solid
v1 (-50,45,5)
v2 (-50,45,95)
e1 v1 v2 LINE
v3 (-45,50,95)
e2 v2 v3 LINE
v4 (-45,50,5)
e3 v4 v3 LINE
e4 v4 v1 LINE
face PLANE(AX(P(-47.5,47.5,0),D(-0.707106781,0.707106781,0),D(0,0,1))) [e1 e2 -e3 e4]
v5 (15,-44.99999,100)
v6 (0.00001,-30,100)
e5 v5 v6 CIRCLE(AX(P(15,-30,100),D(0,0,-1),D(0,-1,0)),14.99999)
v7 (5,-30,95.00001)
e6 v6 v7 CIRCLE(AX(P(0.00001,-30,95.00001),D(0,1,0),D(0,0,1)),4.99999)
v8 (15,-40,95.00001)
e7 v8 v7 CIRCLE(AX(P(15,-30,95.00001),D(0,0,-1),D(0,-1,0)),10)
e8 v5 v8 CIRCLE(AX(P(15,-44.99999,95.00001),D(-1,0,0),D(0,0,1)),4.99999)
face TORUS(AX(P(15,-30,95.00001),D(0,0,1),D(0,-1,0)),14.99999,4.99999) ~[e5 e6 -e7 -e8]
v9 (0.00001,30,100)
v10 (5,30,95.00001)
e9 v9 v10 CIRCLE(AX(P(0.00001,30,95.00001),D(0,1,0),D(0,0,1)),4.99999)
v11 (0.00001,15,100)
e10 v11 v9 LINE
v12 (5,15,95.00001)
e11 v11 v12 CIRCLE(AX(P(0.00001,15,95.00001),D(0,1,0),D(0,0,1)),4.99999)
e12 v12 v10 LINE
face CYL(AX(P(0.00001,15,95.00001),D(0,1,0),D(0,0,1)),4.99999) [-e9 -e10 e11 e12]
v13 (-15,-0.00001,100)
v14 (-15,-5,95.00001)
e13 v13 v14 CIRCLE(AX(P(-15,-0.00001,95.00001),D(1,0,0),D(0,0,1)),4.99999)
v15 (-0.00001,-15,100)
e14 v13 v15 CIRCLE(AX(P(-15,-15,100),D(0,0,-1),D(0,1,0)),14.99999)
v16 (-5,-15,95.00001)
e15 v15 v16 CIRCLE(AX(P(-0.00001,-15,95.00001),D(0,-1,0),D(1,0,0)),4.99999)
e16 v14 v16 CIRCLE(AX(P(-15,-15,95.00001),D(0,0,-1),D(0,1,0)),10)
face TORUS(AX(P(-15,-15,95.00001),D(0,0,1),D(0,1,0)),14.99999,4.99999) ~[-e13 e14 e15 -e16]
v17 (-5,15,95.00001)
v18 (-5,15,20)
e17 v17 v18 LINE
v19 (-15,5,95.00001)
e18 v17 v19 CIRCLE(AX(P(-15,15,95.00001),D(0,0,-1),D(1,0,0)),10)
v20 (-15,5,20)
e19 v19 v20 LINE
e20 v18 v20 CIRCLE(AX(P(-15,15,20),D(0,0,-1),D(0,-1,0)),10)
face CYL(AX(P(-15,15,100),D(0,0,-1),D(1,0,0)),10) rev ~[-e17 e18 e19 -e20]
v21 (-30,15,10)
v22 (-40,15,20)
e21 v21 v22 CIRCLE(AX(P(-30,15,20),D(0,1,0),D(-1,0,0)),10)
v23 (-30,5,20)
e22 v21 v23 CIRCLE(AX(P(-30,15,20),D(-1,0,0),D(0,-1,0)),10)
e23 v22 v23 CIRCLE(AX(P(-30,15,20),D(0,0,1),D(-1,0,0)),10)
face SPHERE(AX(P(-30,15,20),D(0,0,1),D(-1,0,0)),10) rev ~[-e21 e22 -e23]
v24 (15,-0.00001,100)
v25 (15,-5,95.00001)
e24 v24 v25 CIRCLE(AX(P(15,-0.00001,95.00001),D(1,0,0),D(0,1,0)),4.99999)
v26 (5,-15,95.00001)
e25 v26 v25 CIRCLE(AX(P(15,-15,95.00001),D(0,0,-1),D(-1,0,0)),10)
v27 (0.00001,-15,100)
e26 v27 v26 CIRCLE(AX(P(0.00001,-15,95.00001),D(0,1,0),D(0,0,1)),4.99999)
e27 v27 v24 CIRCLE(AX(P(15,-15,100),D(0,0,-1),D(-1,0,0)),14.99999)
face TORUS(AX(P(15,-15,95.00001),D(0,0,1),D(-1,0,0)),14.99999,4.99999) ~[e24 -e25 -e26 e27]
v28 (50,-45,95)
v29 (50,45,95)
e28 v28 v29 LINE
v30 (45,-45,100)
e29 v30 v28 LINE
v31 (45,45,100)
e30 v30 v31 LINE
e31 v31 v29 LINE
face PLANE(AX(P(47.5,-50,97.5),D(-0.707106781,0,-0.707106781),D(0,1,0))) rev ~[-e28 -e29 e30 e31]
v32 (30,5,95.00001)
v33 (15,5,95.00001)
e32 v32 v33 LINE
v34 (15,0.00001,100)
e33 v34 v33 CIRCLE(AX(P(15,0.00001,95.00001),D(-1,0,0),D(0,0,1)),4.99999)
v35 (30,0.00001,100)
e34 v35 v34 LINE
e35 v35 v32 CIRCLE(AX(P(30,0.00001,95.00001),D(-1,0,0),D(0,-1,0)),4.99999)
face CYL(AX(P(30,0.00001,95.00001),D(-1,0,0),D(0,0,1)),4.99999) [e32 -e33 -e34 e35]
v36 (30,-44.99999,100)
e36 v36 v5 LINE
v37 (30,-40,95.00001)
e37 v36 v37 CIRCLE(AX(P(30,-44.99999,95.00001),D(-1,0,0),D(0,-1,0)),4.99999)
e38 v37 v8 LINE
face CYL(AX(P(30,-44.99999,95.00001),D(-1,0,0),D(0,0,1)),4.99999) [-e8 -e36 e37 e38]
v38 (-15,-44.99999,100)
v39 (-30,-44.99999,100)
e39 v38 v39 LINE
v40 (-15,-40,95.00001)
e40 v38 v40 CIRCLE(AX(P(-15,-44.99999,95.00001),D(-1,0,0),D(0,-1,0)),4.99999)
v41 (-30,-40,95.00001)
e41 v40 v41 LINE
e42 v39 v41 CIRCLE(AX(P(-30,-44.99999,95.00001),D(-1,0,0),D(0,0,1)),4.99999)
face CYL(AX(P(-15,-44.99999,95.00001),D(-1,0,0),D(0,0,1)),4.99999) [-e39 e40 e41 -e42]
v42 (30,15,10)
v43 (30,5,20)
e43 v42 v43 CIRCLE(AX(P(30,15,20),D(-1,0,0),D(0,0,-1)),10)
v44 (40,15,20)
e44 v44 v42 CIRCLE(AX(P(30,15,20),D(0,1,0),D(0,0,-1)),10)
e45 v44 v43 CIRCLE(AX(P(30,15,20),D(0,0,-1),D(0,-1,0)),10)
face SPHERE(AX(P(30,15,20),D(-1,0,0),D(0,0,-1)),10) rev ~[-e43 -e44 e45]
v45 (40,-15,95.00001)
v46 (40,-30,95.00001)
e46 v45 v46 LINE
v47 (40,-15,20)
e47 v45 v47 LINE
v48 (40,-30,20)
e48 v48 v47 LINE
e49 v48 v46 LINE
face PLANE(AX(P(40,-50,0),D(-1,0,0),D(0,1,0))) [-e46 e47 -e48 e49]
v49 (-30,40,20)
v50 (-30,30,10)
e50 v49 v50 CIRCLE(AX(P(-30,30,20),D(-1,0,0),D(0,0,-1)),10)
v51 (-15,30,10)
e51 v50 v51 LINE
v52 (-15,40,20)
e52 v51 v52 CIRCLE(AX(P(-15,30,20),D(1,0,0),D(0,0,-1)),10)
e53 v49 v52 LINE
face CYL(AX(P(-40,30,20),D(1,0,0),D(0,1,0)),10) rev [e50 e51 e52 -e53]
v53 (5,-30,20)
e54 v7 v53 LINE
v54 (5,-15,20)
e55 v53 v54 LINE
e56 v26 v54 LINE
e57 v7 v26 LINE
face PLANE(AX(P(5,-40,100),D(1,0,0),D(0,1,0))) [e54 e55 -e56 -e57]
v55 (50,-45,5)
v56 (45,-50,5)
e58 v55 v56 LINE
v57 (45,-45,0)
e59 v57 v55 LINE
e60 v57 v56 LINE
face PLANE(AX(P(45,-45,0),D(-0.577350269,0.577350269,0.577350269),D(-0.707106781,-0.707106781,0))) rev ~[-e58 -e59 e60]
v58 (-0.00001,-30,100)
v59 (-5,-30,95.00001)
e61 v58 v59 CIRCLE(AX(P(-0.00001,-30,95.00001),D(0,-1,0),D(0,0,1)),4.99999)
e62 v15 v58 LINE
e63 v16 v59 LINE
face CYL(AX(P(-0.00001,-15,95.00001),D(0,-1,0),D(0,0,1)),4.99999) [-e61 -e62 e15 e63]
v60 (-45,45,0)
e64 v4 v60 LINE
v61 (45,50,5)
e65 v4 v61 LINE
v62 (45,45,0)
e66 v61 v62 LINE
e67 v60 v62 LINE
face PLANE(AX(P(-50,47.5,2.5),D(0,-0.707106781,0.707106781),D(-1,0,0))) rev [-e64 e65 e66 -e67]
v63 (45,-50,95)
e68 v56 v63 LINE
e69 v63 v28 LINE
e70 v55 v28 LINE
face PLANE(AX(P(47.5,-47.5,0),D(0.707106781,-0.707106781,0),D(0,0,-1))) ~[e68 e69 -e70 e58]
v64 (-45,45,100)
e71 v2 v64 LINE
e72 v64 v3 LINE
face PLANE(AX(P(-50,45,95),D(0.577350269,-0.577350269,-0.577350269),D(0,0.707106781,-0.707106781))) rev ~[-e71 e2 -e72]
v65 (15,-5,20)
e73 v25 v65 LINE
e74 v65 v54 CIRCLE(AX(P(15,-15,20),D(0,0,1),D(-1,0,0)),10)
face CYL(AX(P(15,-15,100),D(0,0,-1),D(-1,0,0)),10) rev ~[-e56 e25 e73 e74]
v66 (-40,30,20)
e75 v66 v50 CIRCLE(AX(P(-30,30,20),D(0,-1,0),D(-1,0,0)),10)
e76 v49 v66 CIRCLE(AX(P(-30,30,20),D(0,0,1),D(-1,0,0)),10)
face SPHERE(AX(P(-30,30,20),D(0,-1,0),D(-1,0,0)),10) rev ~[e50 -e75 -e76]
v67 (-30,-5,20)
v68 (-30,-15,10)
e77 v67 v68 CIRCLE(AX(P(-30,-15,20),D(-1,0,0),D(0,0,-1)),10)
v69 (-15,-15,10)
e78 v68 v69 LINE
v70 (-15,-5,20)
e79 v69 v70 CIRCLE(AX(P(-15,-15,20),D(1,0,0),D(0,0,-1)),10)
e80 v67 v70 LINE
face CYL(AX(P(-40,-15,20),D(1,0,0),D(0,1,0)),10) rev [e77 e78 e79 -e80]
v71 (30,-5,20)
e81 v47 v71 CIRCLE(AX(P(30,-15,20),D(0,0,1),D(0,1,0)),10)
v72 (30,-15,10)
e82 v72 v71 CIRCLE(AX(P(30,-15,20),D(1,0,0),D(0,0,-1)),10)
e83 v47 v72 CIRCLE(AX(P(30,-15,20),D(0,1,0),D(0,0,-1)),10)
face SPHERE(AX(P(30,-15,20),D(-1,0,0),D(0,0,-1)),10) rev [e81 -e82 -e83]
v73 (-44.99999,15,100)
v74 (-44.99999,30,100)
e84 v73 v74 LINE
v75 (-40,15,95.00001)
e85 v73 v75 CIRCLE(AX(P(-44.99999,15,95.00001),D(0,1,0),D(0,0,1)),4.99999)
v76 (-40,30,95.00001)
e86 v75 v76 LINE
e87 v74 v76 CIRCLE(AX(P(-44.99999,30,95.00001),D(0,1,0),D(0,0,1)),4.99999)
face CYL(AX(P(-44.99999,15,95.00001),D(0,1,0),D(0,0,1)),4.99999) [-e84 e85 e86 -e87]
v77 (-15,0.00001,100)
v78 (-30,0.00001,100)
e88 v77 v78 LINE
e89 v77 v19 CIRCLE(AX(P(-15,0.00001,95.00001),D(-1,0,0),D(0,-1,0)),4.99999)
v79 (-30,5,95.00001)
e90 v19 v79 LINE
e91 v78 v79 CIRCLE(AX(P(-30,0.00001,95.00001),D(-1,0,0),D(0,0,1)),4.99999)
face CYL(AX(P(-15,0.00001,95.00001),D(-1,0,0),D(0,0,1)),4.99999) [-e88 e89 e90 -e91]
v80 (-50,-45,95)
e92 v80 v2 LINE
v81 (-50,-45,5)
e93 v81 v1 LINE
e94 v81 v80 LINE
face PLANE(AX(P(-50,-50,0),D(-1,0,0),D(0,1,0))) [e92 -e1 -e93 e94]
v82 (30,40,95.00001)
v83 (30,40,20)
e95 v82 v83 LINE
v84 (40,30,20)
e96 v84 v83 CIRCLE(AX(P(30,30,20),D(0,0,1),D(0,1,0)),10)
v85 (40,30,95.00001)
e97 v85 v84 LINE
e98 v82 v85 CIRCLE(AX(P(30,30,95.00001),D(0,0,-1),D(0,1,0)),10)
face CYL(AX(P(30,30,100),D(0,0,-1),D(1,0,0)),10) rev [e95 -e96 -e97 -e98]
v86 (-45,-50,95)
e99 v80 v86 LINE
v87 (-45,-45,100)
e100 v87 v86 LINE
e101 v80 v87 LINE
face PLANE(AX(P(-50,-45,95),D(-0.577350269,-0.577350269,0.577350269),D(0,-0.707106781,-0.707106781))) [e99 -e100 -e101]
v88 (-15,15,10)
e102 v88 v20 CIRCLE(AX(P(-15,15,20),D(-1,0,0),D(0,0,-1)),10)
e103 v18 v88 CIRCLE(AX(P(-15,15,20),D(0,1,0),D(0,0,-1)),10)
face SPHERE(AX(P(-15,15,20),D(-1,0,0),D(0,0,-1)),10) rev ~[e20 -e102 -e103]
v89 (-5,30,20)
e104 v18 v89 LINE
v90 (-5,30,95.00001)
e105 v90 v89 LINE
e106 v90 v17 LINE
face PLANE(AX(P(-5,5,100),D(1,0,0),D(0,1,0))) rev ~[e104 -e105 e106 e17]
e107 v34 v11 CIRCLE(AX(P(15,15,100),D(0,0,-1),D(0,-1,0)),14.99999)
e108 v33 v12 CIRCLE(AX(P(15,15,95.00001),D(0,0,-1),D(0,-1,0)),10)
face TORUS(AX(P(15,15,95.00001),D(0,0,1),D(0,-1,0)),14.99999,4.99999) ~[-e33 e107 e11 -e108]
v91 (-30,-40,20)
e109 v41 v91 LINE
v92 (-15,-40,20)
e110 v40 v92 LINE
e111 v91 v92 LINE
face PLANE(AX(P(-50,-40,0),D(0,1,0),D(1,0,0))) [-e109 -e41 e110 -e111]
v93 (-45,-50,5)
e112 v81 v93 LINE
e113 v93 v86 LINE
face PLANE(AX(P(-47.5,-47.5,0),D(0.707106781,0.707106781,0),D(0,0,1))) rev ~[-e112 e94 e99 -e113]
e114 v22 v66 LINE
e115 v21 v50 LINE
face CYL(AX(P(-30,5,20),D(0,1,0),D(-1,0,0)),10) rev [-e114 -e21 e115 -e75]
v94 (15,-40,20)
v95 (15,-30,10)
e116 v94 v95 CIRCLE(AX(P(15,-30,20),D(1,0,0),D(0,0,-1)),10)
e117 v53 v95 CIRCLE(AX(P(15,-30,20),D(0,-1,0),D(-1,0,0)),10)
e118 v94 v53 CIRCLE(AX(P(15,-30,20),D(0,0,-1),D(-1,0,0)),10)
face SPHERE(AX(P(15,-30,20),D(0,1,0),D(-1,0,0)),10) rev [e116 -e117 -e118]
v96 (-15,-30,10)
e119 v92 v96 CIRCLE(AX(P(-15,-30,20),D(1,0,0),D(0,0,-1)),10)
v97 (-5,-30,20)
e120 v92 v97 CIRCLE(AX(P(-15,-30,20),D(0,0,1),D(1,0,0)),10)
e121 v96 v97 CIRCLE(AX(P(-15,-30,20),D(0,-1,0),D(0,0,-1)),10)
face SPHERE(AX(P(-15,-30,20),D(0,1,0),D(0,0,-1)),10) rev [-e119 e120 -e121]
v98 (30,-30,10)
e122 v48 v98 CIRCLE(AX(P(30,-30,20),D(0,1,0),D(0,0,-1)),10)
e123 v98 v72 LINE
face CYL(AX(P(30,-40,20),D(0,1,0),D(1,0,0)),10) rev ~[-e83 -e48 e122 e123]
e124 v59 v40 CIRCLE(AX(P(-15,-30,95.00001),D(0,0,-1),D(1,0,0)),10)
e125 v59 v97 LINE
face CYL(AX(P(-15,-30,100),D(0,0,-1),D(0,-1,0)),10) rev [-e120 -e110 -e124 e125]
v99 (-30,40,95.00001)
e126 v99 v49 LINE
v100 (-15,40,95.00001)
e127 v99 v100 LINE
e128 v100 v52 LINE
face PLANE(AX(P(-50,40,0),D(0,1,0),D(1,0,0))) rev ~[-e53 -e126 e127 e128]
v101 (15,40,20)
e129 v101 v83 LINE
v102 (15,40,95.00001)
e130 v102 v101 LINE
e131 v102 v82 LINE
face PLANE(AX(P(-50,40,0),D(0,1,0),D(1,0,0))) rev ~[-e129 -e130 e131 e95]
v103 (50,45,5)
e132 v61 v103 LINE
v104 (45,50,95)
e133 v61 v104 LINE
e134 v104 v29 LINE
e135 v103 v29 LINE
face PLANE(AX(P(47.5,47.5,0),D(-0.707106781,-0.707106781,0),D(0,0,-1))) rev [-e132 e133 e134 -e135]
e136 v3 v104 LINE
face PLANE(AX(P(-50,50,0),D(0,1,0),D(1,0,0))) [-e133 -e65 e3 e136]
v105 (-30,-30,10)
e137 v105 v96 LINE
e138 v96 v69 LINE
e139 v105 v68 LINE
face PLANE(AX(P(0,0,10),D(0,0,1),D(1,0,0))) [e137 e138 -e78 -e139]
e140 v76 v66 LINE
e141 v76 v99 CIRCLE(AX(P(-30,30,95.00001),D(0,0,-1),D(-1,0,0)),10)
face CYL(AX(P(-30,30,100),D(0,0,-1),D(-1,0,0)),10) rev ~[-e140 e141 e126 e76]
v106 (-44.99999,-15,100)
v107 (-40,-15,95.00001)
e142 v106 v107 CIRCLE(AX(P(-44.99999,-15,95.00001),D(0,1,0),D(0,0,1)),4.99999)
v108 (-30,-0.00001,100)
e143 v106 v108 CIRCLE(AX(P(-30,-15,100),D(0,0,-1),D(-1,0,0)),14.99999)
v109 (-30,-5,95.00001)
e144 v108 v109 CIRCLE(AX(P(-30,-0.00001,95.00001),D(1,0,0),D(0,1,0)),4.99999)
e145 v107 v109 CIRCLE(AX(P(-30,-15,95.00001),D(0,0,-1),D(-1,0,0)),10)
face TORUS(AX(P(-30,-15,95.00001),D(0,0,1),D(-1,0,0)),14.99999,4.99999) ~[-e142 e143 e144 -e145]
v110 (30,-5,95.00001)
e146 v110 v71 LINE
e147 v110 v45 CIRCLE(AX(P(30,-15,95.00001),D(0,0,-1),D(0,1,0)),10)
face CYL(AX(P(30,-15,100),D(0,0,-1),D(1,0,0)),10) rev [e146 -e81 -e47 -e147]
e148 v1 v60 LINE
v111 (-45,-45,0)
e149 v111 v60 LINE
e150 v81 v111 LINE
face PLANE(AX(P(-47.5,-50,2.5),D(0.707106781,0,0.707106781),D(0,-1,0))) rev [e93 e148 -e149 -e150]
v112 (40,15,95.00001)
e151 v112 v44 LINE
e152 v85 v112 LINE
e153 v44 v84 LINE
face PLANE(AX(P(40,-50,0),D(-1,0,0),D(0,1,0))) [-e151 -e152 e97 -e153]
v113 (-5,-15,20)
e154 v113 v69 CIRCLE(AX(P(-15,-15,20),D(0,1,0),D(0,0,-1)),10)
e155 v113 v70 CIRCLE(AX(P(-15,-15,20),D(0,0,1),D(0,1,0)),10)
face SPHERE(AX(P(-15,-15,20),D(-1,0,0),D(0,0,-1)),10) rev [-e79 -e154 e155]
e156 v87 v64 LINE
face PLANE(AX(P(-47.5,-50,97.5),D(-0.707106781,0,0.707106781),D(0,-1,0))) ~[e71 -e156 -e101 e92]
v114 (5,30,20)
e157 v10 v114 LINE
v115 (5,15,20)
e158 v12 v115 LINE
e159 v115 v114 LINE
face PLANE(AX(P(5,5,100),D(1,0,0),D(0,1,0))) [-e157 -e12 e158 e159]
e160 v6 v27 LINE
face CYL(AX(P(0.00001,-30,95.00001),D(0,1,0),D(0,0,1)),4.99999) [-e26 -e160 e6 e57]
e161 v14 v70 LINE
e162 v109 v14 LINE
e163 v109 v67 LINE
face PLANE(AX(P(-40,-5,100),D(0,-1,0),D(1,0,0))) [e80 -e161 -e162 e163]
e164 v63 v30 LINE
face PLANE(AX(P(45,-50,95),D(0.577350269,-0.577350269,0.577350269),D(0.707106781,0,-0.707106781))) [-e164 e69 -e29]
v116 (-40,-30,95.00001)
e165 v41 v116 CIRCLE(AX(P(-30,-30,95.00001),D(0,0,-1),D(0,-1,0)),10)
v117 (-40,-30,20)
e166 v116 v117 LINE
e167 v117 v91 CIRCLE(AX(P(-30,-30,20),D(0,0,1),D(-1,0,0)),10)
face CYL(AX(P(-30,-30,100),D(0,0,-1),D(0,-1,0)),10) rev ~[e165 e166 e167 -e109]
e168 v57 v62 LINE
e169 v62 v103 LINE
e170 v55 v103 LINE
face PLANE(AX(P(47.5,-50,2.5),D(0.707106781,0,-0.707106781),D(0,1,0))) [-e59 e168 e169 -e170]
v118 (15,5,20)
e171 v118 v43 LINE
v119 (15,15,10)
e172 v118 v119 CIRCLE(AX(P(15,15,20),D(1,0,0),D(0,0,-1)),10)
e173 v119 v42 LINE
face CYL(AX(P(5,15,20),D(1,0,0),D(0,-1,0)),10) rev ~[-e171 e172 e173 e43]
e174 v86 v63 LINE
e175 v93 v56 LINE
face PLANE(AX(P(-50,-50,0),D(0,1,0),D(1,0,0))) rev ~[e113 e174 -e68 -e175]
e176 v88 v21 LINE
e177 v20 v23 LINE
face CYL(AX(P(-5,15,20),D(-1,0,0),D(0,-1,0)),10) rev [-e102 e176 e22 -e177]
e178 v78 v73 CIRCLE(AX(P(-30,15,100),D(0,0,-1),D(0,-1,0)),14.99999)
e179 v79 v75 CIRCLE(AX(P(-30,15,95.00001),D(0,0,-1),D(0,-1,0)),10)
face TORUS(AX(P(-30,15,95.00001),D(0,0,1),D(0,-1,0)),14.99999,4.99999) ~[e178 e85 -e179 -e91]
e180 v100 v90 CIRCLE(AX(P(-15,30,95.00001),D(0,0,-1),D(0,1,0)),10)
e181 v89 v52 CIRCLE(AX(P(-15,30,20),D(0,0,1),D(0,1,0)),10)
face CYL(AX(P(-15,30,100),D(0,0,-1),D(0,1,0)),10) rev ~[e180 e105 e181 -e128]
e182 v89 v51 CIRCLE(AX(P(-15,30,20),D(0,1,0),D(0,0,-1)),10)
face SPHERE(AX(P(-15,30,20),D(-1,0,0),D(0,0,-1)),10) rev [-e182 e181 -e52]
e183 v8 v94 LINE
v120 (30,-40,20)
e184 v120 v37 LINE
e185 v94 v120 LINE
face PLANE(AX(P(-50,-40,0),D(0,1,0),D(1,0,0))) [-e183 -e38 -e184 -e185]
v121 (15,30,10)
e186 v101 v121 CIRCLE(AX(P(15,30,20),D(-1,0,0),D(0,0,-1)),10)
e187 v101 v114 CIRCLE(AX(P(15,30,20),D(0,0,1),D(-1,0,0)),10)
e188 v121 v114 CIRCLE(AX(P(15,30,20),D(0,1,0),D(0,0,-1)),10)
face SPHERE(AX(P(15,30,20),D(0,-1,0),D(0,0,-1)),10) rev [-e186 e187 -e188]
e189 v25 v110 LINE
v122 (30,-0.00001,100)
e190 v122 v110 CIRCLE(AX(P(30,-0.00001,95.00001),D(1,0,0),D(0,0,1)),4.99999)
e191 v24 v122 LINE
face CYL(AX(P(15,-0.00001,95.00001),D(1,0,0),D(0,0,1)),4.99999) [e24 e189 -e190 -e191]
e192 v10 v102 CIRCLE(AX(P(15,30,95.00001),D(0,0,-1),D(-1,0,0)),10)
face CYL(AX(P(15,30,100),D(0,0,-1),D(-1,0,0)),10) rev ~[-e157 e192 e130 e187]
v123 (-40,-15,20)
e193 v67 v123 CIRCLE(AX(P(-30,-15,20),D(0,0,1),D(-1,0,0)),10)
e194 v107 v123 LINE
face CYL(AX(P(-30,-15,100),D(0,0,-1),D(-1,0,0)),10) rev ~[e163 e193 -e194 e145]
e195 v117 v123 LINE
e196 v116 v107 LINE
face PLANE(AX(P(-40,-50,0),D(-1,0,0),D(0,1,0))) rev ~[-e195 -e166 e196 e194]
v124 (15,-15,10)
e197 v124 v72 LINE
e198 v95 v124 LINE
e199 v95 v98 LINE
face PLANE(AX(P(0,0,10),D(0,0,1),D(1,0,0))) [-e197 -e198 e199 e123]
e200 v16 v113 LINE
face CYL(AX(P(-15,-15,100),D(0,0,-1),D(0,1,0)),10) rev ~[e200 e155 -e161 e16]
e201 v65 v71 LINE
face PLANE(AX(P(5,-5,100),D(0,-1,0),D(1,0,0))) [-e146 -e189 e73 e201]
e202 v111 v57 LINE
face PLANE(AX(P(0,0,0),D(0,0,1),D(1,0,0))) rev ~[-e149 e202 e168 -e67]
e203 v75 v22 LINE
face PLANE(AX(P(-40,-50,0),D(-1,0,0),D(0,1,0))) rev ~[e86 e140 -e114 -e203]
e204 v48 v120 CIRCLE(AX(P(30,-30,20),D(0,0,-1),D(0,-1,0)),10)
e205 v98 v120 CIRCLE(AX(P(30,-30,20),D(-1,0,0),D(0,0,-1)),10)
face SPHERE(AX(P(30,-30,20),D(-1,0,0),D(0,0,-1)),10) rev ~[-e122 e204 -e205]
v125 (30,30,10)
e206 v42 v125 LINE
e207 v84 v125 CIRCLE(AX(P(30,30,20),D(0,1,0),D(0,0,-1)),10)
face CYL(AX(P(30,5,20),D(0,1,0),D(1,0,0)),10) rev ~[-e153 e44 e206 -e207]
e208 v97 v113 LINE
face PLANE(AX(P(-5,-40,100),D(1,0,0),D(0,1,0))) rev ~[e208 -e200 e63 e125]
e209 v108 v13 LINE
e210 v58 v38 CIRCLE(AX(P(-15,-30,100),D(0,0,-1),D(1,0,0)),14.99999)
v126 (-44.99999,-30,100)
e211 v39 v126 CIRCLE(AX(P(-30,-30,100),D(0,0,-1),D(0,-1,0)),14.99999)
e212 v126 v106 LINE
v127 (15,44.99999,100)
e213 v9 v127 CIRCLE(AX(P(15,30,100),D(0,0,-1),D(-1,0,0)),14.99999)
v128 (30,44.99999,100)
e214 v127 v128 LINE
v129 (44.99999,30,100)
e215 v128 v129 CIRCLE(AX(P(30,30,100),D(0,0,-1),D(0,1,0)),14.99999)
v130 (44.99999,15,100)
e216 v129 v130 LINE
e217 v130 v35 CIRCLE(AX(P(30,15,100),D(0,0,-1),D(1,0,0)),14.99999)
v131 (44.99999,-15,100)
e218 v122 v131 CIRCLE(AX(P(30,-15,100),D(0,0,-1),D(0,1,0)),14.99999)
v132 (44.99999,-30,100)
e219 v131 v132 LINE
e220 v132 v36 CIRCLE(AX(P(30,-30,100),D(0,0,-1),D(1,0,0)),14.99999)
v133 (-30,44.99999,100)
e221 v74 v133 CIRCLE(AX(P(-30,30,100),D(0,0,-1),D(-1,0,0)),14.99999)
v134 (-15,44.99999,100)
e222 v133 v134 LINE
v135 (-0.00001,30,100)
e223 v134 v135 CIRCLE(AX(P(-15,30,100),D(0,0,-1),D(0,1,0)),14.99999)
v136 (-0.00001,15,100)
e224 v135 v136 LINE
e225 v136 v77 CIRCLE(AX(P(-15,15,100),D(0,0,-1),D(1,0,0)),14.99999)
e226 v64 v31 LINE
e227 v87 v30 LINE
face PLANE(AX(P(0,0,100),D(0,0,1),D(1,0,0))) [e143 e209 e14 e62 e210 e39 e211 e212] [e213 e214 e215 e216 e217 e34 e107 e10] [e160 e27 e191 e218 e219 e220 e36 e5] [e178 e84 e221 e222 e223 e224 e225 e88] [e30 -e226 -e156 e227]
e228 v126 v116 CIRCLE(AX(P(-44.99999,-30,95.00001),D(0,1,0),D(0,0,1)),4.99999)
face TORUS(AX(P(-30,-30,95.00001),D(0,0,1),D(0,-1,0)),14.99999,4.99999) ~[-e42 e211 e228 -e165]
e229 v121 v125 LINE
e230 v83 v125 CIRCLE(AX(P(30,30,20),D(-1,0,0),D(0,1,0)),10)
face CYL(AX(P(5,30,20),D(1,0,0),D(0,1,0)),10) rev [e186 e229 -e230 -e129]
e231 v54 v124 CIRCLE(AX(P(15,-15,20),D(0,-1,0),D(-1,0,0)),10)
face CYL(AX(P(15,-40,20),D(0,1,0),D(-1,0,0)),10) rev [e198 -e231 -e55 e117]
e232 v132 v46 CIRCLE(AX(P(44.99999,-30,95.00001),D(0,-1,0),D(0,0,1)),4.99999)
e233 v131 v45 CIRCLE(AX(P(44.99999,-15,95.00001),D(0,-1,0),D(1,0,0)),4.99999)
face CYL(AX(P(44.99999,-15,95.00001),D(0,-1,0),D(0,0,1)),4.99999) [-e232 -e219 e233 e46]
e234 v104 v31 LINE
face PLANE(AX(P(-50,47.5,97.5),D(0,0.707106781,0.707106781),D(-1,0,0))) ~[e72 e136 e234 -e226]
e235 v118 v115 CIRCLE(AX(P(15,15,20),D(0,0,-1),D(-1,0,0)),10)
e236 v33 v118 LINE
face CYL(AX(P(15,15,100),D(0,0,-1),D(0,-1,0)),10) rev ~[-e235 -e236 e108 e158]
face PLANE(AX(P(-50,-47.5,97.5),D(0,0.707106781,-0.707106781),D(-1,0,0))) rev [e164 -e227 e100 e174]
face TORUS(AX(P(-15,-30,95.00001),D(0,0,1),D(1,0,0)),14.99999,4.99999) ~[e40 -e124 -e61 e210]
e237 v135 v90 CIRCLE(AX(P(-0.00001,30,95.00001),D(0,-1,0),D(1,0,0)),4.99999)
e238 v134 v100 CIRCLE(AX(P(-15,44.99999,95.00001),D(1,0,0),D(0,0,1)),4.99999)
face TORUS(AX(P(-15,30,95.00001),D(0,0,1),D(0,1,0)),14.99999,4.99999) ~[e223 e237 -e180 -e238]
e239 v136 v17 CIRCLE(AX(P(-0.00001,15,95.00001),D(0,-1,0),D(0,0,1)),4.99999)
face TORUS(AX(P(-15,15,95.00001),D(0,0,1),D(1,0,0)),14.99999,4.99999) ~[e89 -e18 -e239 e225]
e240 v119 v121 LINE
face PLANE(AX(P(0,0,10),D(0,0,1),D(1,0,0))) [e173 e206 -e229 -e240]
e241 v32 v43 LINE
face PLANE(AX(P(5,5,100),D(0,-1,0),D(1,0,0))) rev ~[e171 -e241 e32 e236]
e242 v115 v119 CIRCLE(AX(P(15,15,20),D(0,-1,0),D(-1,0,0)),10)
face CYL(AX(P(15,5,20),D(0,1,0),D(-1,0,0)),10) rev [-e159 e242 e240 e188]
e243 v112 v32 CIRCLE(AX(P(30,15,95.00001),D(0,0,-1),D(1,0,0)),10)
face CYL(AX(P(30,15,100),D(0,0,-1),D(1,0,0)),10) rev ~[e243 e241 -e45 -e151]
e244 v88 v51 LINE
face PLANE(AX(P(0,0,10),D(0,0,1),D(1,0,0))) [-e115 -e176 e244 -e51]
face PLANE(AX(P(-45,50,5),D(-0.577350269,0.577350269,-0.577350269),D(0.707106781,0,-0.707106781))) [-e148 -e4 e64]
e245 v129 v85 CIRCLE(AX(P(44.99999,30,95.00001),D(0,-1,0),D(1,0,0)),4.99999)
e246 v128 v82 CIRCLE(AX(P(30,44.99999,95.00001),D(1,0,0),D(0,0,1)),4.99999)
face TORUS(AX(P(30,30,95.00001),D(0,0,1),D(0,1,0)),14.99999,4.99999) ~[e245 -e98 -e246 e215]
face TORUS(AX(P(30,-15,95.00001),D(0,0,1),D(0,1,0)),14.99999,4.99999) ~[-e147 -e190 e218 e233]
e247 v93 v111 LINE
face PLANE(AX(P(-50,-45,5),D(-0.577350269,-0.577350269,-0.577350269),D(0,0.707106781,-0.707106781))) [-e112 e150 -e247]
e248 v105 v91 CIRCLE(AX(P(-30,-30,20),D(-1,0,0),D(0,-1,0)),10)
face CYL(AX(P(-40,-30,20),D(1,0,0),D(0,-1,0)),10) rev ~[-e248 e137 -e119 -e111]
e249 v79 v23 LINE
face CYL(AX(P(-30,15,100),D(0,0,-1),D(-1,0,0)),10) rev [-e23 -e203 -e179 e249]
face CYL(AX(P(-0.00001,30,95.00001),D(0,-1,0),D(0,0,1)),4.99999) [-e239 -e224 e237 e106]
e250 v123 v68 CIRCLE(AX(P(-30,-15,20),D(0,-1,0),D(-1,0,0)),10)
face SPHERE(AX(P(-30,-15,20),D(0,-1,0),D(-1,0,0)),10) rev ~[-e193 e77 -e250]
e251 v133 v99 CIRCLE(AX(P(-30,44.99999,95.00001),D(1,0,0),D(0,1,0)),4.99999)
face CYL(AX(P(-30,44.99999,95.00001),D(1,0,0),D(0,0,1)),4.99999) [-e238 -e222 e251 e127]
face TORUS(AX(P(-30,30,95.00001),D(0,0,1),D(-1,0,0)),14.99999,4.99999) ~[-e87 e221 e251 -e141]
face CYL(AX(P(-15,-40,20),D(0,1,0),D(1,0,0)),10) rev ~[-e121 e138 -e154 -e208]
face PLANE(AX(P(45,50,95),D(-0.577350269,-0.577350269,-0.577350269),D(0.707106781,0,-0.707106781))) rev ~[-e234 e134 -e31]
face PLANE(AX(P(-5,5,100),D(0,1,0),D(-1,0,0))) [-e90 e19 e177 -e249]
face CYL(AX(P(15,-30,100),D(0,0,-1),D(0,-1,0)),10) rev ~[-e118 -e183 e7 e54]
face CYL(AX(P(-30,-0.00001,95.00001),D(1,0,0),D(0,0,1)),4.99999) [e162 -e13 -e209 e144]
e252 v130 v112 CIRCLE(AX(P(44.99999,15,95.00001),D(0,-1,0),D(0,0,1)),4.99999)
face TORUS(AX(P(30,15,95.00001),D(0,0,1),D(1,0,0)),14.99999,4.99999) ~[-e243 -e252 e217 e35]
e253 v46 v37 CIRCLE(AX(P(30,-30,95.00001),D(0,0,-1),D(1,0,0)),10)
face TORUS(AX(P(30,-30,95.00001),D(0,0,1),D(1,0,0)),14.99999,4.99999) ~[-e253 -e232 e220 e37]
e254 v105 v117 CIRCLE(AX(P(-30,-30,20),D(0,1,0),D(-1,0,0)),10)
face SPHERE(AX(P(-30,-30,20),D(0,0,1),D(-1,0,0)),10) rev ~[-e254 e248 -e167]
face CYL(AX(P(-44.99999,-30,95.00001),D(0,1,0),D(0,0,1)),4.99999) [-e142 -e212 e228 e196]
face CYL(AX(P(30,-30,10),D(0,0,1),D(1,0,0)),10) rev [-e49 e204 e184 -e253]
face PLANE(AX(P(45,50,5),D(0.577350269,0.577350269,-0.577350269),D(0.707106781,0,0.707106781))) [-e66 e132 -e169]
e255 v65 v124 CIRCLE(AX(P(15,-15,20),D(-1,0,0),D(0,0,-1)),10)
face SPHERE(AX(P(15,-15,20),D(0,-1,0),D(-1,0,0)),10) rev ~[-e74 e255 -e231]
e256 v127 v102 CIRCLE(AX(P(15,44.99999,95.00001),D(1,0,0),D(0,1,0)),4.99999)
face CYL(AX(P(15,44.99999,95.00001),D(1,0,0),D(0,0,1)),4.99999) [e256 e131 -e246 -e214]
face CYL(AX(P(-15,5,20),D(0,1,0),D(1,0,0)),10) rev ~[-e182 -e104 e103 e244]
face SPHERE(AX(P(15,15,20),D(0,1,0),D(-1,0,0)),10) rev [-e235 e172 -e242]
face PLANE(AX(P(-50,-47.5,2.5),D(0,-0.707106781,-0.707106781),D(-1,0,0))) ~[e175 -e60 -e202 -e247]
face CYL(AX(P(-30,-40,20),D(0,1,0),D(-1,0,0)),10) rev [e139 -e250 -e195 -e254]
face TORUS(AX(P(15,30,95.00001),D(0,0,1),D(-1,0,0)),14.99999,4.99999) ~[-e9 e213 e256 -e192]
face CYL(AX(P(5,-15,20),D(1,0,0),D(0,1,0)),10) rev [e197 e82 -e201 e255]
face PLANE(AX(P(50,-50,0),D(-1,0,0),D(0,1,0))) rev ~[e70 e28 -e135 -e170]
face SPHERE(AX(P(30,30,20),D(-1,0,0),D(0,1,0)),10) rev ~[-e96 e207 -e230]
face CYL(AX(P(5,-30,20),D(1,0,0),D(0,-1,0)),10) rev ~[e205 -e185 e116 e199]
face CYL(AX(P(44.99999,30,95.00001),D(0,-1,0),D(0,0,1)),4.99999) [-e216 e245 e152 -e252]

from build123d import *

# Parameters (mm, degrees)
F0_W     = 100
F0_H     = 100
F1_DEPTH = 100
F2_T     = -10
F3_W     = 35
F3_H     = 10
F3_W_2   = 10
F3_H_2   = 35
F4_DEPTH = 90
F5_SIZE  = 5
F6_R     = 10
F7_R     = 4.99999


# Not quite as in the source:
# - a fillet or chamfer is up to 0.001 mm smaller than in the source, because OpenCascade refuses the exact size


with BuildPart() as f1:
    # F0 (on Top) → F1 (new body)
    with BuildSketch(Plane.XY):
        Rectangle(F0_W, F0_H)
    extrude(amount=F1_DEPTH)

    # F2
    f2_openings = [f1.faces().sort_by_distance(p)[0] for p in [
        (0, 0, 100),
    ]]
    offset(amount=F2_T, openings=f2_openings)

    # F3 (on face) → F4 (join, through all)
    with BuildSketch(Plane.XY.offset(100)):
        with Locations((-22.5, 0)):
            Rectangle(F3_W, F3_H)
        Rectangle(F3_W_2, F3_H)
        with Locations((0, -22.5)):
            Rectangle(F3_W_2, F3_H_2)
        with Locations((0, 22.5)):
            Rectangle(F3_W_2, F3_H_2)
        with Locations((22.5, 0)):
            Rectangle(F3_W, F3_H)
    extrude(amount=-F4_DEPTH)

    # F5
    f5_edges = [f1.edges().sort_by_distance(p)[0] for p in [
        (50, 0, 100),
        (0, -50, 100),
        (0, 50, 100),
        (-50, 0, 100),
        (50, -50, 50),
        (50, 0, 0),
        (0, -50, 0),
        (-50, -50, 50),
        (-50, 0, 0),
        (-50, 50, 50),
        (0, 50, 0),
        (50, 50, 50),
    ]]
    chamfer(f5_edges, length=F5_SIZE)

    # F6
    f6_edges = [f1.edges().sort_by_distance(p)[0] for p in [
        (-40, -40, 55),
        (-40, -22.5, 10),
        (-40, -5, 55),
        (-22.5, -5, 10),
        (-5, -22.5, 10),
        (-22.5, -40, 10),
        (-5, -5, 55),
        (-5, -40, 55),
        (-40, 5, 55),
        (-40, 22.5, 10),
        (-22.5, 5, 10),
        (-40, 40, 55),
        (-22.5, 40, 10),
        (-5, 22.5, 10),
        (-5, 5, 55),
        (-5, 40, 55),
        (5, -22.5, 10),
        (5, 22.5, 10),
        (22.5, 40, 10),
        (5, 40, 55),
        (5, 5, 55),
        (22.5, 5, 10),
        (40, 40, 55),
        (40, 22.5, 10),
        (40, 5, 55),
        (5, -5, 55),
        (22.5, -5, 10),
        (5, -40, 55),
        (22.5, -40, 10),
        (40, -22.5, 10),
        (40, -5, 55),
        (40, -40, 55),
    ]]
    fillet(f6_edges, radius=F6_R)

    # F7 (radius 5 in the source; OpenCascade refuses exactly that, so slightly less here)
    f7_edges = [f1.edges().sort_by_distance(p)[0] for p in [
        (-40, -22.5, 100),
        (-40, 22.5, 100),
        (5, 22.5, 100),
        (5, -22.5, 100),
    ]]
    fillet(f7_edges, radius=F7_R)


solid = f1.part
